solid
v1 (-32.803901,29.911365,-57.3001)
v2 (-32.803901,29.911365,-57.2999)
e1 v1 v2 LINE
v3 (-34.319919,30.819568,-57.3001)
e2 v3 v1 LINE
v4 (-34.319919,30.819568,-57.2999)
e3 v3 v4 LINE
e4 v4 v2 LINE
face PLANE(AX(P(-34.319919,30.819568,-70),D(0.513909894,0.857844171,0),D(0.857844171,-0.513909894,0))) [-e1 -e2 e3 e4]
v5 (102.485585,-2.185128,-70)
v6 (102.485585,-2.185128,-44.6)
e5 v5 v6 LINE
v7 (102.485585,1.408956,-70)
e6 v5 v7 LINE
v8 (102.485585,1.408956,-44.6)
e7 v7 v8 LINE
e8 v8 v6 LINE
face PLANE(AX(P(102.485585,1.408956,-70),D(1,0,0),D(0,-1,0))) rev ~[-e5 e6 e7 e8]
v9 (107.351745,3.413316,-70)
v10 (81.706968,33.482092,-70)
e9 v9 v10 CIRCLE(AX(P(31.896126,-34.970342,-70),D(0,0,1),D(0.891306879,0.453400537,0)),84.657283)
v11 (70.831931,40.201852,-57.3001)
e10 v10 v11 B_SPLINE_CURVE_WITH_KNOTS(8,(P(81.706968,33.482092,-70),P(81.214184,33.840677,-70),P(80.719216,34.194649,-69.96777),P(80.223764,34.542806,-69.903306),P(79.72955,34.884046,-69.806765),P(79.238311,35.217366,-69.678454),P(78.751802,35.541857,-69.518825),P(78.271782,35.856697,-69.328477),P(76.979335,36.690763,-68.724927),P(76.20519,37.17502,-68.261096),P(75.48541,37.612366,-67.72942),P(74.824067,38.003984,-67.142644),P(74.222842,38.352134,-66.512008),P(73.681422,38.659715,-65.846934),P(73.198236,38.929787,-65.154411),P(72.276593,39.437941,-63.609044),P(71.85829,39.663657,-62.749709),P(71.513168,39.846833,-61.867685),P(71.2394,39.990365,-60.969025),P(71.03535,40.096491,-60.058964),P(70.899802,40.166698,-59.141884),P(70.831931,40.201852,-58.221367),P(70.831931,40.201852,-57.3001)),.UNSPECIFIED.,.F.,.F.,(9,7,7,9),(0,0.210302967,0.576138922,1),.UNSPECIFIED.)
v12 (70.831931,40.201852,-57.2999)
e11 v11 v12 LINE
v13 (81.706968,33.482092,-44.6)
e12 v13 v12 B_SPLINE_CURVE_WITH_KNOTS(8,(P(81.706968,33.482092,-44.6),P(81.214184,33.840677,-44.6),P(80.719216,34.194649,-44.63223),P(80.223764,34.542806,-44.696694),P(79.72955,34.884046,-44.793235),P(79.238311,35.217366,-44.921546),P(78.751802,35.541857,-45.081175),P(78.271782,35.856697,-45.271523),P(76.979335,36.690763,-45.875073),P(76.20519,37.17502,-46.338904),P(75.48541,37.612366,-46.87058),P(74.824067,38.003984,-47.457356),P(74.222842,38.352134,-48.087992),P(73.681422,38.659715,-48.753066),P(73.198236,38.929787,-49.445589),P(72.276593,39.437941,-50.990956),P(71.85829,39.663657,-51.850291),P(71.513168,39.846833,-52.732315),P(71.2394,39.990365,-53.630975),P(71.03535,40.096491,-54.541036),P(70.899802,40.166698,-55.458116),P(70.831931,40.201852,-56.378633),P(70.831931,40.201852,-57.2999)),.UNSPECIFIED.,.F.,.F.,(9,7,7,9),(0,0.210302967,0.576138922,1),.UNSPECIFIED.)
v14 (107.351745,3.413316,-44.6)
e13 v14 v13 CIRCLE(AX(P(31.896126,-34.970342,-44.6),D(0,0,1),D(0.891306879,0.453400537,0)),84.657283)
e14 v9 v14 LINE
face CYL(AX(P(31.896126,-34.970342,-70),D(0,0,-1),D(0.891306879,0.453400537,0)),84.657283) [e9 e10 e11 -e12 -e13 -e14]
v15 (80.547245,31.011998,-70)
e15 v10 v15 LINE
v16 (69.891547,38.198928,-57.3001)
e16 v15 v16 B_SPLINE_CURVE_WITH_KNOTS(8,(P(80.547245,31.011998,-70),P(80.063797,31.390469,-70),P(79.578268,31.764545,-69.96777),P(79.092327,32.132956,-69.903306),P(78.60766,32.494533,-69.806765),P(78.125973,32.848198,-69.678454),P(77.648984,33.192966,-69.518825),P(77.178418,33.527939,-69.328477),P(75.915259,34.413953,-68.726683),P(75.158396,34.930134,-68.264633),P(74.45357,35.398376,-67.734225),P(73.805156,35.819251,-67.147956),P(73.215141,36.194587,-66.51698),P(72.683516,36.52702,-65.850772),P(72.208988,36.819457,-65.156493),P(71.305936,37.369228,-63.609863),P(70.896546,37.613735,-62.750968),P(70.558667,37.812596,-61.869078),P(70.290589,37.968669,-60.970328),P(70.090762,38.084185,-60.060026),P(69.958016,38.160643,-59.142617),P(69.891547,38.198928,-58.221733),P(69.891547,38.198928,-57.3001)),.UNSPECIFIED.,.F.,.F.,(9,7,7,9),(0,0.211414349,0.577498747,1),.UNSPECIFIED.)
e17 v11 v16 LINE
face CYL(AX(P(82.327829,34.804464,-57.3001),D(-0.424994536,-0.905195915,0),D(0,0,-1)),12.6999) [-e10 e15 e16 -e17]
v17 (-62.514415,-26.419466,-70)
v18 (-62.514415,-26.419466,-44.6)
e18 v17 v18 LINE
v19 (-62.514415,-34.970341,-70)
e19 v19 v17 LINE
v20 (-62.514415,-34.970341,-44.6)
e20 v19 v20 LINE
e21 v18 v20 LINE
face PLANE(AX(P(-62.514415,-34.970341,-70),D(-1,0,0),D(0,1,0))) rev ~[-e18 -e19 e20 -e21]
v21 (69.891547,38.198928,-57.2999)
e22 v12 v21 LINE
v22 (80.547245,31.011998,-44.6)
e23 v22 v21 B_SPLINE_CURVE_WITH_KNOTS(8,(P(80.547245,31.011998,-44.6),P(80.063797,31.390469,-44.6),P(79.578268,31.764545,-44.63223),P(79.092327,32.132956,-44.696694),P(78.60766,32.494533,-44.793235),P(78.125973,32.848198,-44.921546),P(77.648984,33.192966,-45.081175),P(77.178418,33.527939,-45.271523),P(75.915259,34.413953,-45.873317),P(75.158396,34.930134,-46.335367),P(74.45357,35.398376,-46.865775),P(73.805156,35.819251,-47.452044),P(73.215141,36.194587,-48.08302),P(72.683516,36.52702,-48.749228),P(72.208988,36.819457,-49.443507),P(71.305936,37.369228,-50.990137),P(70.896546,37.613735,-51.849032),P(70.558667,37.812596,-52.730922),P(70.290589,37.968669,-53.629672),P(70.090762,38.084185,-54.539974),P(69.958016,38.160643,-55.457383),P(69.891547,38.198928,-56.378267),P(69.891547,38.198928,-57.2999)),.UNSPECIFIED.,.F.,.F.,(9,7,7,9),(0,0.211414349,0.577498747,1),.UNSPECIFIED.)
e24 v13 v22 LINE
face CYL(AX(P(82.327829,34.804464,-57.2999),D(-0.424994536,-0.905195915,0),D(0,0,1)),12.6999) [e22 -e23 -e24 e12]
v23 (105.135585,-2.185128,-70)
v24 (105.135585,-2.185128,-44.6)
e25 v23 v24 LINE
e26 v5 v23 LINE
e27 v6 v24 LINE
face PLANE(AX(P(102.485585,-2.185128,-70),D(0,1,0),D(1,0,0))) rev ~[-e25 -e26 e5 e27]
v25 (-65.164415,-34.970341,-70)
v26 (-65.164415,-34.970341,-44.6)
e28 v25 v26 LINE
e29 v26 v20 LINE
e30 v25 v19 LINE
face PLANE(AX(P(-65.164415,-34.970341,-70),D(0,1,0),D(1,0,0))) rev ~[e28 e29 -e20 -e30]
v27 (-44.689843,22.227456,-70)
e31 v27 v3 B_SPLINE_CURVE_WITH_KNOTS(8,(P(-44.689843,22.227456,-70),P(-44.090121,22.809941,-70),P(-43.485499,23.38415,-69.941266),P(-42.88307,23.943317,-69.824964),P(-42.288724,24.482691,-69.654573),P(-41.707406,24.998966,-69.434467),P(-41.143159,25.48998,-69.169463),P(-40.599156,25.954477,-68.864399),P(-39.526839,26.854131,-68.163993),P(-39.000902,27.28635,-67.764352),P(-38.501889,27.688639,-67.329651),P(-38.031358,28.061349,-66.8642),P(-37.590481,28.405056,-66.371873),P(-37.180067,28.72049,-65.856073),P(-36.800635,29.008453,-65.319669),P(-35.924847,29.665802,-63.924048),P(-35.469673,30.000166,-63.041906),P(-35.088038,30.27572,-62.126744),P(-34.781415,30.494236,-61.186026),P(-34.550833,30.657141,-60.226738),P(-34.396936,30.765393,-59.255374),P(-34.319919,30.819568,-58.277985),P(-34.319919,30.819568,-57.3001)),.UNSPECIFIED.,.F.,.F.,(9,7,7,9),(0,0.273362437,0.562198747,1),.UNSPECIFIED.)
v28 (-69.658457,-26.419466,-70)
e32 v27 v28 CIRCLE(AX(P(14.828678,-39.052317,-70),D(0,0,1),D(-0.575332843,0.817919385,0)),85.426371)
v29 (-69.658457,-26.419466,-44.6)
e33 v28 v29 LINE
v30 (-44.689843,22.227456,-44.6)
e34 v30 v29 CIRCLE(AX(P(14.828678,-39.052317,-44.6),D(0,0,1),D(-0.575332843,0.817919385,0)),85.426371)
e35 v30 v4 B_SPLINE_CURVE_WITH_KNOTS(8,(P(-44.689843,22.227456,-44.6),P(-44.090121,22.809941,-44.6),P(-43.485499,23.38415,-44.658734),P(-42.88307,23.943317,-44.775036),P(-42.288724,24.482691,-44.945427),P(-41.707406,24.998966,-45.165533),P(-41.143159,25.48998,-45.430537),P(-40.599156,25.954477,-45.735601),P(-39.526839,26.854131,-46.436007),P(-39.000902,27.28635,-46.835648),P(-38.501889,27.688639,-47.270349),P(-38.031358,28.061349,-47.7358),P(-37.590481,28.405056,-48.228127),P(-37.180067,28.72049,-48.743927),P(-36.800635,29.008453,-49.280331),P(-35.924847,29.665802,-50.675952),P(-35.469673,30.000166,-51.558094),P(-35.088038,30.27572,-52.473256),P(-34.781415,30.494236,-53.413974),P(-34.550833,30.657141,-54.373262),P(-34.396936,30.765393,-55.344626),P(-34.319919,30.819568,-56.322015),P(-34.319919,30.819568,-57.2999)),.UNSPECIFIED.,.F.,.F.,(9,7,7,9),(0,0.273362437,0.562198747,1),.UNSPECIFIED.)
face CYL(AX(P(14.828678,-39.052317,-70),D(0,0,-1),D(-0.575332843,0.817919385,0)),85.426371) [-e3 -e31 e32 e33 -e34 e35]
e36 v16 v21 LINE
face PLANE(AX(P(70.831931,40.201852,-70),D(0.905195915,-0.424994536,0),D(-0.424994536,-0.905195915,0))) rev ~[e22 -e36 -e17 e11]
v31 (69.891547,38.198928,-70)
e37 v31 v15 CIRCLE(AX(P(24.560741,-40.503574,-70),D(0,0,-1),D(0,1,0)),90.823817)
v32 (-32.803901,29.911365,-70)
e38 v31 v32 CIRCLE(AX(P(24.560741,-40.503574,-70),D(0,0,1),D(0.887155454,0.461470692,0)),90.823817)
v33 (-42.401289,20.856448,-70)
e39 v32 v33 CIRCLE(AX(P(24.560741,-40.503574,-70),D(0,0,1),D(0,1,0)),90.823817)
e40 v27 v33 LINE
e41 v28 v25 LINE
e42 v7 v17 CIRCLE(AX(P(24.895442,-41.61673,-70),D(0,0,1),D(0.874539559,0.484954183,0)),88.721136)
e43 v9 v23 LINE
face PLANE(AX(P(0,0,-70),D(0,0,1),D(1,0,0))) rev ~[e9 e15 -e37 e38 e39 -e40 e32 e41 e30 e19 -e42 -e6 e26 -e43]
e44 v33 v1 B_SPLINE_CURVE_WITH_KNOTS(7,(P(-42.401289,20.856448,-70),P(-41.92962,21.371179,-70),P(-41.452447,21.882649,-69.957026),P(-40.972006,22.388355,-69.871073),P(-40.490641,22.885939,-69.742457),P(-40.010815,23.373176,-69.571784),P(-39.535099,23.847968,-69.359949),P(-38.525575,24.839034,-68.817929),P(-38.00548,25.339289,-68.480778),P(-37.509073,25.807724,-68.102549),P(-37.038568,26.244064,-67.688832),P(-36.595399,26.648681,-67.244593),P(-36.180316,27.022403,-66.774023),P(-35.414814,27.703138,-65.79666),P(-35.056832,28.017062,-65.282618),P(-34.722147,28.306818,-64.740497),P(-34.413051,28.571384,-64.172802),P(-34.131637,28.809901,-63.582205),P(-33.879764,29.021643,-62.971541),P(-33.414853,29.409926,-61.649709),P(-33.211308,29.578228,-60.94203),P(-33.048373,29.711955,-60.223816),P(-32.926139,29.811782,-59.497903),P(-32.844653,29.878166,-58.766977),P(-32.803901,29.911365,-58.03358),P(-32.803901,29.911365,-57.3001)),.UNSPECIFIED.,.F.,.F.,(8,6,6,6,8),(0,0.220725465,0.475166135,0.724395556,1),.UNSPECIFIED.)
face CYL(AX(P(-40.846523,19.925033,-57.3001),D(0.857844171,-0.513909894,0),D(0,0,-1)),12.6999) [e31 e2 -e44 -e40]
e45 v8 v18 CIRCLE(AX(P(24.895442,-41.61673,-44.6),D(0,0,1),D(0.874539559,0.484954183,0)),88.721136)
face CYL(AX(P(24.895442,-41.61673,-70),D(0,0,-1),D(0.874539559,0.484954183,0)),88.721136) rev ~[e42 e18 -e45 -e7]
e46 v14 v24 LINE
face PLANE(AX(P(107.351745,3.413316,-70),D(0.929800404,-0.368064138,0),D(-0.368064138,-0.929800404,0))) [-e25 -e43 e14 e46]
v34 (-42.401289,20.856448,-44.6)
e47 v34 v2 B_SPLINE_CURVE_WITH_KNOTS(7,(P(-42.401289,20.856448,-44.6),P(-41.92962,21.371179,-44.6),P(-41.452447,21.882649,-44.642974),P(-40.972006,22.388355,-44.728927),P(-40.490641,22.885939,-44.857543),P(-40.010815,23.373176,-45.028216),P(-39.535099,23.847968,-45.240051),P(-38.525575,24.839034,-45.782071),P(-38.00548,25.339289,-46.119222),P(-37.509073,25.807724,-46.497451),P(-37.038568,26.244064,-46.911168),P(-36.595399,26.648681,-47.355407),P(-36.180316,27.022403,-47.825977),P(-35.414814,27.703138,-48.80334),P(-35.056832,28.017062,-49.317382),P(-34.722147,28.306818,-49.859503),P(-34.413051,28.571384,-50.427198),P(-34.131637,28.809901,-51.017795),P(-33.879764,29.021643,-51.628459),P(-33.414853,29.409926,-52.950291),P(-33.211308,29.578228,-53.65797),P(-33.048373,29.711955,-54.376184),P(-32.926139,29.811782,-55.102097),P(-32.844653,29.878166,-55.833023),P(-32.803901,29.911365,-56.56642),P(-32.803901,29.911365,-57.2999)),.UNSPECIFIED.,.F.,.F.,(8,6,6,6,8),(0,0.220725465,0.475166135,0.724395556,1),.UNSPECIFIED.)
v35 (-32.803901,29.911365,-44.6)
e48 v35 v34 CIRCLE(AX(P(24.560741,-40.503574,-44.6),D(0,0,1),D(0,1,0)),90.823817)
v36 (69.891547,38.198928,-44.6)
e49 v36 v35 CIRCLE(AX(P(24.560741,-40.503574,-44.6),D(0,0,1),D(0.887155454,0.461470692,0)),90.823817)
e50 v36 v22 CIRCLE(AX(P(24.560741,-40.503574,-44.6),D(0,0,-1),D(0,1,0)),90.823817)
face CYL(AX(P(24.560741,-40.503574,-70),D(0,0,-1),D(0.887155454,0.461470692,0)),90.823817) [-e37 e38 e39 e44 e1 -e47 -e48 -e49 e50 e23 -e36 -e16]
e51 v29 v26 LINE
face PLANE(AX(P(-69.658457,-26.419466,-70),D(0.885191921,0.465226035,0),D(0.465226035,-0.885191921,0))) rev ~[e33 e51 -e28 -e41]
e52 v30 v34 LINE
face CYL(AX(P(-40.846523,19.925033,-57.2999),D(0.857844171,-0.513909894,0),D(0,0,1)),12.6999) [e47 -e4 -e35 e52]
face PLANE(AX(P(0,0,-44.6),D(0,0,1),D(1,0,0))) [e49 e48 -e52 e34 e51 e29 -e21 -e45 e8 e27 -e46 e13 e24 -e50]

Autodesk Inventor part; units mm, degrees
ref_plane "YZ Plane" through (0, 0, 0) normal (1, 0, 0) x (0, 1, 0)
ref_plane "XZ Plane" through (0, 0, 0) normal (0, 1, 0) x (-1, 0, 0)
ref_plane "Work Plane1" through (0, 0, -70) normal (0, 0, 1) x (1, 0, 0)
sketch "Sketch1" plane through (0, 0, -70) normal (0, 0, 1) x (1, 0, 0)
  line L0 (105.135585, -0.094334) -> (105.135585, -23.278359)
  line L1 (-62.514415, -50.241251) -> (-62.514415, -27.759659)
  line L2 (-62.514415, -26.419466) -> (-62.514415, -51.782245)
  line L3 (102.485585, -0.094334) -> (102.485585, -23.278359)
  line L4 (102.485585, 1.408956) -> (105.135585, 1.408956)
  line L5 (-62.514415, -26.419466) -> (-62.514415, -51.782245)
  line L6 (-65.164415, -50.241251) -> (-65.164415, -27.759659)
  line L7 (-62.514415, -26.419466) -> (-65.164415, -26.419466)
  arc A0 (105.135585, 1.408956) -> (-65.164415, -26.419466) centre (24.560741, -40.503573) ccw
  line L8 (-65.164415, -26.419466) -> (-67.161965, -26.419466)
  arc A1 (102.485585, 1.408956) -> (-62.514415, -26.419466) centre (24.895442, -41.61673) ccw
  line L9 (-65.164415, -26.419466) -> (-69.658457, -26.419466)
  arc A2 (-34.319919, 30.819568) -> (-69.658457, -26.419466) centre (14.828678, -39.052317) ccw
  line L10 (-34.319919, 30.819568) -> (-32.803901, 29.911365)
  line L11 (105.135585, 1.408956) -> (107.351745, 3.413316)
  arc A3 (107.351745, 3.413316) -> (70.831931, 40.201852) centre (31.896127, -34.970341) ccw
  line L12 (70.831931, 40.201852) -> (69.891547, 38.198928)
  line L13 (102.485585, 1.408956) -> (102.485585, -2.185128)
  line L14 (102.485585, -2.185128) -> (105.135585, -2.185128)
  line L15 (107.351745, 3.413316) -> (105.135585, -2.185128)
  line L16 (-69.658457, -26.419466) -> (-65.164415, -34.970341)
  line L17 (-65.164415, -34.970341) -> (-62.514415, -34.970341)
  line L18 (-62.514415, -34.970341) -> (-62.514415, -26.419466)
  point P0 (0, 0)
  point P1 (-31.670702, 30.819568)
extrude "Extrusion1" add sketch "Sketch1" along normal blind 25.4
fillet "Fillet1" radius 12.7 4 edges at (-33.5619, 30.3655, -70) (-33.5619, 30.3655, -44.6) (70.3617, 39.2004, -70) (70.3617, 39.2004, -44.6)
properties part number "thigh_strap_01" material "Acetal Resin, Black"
